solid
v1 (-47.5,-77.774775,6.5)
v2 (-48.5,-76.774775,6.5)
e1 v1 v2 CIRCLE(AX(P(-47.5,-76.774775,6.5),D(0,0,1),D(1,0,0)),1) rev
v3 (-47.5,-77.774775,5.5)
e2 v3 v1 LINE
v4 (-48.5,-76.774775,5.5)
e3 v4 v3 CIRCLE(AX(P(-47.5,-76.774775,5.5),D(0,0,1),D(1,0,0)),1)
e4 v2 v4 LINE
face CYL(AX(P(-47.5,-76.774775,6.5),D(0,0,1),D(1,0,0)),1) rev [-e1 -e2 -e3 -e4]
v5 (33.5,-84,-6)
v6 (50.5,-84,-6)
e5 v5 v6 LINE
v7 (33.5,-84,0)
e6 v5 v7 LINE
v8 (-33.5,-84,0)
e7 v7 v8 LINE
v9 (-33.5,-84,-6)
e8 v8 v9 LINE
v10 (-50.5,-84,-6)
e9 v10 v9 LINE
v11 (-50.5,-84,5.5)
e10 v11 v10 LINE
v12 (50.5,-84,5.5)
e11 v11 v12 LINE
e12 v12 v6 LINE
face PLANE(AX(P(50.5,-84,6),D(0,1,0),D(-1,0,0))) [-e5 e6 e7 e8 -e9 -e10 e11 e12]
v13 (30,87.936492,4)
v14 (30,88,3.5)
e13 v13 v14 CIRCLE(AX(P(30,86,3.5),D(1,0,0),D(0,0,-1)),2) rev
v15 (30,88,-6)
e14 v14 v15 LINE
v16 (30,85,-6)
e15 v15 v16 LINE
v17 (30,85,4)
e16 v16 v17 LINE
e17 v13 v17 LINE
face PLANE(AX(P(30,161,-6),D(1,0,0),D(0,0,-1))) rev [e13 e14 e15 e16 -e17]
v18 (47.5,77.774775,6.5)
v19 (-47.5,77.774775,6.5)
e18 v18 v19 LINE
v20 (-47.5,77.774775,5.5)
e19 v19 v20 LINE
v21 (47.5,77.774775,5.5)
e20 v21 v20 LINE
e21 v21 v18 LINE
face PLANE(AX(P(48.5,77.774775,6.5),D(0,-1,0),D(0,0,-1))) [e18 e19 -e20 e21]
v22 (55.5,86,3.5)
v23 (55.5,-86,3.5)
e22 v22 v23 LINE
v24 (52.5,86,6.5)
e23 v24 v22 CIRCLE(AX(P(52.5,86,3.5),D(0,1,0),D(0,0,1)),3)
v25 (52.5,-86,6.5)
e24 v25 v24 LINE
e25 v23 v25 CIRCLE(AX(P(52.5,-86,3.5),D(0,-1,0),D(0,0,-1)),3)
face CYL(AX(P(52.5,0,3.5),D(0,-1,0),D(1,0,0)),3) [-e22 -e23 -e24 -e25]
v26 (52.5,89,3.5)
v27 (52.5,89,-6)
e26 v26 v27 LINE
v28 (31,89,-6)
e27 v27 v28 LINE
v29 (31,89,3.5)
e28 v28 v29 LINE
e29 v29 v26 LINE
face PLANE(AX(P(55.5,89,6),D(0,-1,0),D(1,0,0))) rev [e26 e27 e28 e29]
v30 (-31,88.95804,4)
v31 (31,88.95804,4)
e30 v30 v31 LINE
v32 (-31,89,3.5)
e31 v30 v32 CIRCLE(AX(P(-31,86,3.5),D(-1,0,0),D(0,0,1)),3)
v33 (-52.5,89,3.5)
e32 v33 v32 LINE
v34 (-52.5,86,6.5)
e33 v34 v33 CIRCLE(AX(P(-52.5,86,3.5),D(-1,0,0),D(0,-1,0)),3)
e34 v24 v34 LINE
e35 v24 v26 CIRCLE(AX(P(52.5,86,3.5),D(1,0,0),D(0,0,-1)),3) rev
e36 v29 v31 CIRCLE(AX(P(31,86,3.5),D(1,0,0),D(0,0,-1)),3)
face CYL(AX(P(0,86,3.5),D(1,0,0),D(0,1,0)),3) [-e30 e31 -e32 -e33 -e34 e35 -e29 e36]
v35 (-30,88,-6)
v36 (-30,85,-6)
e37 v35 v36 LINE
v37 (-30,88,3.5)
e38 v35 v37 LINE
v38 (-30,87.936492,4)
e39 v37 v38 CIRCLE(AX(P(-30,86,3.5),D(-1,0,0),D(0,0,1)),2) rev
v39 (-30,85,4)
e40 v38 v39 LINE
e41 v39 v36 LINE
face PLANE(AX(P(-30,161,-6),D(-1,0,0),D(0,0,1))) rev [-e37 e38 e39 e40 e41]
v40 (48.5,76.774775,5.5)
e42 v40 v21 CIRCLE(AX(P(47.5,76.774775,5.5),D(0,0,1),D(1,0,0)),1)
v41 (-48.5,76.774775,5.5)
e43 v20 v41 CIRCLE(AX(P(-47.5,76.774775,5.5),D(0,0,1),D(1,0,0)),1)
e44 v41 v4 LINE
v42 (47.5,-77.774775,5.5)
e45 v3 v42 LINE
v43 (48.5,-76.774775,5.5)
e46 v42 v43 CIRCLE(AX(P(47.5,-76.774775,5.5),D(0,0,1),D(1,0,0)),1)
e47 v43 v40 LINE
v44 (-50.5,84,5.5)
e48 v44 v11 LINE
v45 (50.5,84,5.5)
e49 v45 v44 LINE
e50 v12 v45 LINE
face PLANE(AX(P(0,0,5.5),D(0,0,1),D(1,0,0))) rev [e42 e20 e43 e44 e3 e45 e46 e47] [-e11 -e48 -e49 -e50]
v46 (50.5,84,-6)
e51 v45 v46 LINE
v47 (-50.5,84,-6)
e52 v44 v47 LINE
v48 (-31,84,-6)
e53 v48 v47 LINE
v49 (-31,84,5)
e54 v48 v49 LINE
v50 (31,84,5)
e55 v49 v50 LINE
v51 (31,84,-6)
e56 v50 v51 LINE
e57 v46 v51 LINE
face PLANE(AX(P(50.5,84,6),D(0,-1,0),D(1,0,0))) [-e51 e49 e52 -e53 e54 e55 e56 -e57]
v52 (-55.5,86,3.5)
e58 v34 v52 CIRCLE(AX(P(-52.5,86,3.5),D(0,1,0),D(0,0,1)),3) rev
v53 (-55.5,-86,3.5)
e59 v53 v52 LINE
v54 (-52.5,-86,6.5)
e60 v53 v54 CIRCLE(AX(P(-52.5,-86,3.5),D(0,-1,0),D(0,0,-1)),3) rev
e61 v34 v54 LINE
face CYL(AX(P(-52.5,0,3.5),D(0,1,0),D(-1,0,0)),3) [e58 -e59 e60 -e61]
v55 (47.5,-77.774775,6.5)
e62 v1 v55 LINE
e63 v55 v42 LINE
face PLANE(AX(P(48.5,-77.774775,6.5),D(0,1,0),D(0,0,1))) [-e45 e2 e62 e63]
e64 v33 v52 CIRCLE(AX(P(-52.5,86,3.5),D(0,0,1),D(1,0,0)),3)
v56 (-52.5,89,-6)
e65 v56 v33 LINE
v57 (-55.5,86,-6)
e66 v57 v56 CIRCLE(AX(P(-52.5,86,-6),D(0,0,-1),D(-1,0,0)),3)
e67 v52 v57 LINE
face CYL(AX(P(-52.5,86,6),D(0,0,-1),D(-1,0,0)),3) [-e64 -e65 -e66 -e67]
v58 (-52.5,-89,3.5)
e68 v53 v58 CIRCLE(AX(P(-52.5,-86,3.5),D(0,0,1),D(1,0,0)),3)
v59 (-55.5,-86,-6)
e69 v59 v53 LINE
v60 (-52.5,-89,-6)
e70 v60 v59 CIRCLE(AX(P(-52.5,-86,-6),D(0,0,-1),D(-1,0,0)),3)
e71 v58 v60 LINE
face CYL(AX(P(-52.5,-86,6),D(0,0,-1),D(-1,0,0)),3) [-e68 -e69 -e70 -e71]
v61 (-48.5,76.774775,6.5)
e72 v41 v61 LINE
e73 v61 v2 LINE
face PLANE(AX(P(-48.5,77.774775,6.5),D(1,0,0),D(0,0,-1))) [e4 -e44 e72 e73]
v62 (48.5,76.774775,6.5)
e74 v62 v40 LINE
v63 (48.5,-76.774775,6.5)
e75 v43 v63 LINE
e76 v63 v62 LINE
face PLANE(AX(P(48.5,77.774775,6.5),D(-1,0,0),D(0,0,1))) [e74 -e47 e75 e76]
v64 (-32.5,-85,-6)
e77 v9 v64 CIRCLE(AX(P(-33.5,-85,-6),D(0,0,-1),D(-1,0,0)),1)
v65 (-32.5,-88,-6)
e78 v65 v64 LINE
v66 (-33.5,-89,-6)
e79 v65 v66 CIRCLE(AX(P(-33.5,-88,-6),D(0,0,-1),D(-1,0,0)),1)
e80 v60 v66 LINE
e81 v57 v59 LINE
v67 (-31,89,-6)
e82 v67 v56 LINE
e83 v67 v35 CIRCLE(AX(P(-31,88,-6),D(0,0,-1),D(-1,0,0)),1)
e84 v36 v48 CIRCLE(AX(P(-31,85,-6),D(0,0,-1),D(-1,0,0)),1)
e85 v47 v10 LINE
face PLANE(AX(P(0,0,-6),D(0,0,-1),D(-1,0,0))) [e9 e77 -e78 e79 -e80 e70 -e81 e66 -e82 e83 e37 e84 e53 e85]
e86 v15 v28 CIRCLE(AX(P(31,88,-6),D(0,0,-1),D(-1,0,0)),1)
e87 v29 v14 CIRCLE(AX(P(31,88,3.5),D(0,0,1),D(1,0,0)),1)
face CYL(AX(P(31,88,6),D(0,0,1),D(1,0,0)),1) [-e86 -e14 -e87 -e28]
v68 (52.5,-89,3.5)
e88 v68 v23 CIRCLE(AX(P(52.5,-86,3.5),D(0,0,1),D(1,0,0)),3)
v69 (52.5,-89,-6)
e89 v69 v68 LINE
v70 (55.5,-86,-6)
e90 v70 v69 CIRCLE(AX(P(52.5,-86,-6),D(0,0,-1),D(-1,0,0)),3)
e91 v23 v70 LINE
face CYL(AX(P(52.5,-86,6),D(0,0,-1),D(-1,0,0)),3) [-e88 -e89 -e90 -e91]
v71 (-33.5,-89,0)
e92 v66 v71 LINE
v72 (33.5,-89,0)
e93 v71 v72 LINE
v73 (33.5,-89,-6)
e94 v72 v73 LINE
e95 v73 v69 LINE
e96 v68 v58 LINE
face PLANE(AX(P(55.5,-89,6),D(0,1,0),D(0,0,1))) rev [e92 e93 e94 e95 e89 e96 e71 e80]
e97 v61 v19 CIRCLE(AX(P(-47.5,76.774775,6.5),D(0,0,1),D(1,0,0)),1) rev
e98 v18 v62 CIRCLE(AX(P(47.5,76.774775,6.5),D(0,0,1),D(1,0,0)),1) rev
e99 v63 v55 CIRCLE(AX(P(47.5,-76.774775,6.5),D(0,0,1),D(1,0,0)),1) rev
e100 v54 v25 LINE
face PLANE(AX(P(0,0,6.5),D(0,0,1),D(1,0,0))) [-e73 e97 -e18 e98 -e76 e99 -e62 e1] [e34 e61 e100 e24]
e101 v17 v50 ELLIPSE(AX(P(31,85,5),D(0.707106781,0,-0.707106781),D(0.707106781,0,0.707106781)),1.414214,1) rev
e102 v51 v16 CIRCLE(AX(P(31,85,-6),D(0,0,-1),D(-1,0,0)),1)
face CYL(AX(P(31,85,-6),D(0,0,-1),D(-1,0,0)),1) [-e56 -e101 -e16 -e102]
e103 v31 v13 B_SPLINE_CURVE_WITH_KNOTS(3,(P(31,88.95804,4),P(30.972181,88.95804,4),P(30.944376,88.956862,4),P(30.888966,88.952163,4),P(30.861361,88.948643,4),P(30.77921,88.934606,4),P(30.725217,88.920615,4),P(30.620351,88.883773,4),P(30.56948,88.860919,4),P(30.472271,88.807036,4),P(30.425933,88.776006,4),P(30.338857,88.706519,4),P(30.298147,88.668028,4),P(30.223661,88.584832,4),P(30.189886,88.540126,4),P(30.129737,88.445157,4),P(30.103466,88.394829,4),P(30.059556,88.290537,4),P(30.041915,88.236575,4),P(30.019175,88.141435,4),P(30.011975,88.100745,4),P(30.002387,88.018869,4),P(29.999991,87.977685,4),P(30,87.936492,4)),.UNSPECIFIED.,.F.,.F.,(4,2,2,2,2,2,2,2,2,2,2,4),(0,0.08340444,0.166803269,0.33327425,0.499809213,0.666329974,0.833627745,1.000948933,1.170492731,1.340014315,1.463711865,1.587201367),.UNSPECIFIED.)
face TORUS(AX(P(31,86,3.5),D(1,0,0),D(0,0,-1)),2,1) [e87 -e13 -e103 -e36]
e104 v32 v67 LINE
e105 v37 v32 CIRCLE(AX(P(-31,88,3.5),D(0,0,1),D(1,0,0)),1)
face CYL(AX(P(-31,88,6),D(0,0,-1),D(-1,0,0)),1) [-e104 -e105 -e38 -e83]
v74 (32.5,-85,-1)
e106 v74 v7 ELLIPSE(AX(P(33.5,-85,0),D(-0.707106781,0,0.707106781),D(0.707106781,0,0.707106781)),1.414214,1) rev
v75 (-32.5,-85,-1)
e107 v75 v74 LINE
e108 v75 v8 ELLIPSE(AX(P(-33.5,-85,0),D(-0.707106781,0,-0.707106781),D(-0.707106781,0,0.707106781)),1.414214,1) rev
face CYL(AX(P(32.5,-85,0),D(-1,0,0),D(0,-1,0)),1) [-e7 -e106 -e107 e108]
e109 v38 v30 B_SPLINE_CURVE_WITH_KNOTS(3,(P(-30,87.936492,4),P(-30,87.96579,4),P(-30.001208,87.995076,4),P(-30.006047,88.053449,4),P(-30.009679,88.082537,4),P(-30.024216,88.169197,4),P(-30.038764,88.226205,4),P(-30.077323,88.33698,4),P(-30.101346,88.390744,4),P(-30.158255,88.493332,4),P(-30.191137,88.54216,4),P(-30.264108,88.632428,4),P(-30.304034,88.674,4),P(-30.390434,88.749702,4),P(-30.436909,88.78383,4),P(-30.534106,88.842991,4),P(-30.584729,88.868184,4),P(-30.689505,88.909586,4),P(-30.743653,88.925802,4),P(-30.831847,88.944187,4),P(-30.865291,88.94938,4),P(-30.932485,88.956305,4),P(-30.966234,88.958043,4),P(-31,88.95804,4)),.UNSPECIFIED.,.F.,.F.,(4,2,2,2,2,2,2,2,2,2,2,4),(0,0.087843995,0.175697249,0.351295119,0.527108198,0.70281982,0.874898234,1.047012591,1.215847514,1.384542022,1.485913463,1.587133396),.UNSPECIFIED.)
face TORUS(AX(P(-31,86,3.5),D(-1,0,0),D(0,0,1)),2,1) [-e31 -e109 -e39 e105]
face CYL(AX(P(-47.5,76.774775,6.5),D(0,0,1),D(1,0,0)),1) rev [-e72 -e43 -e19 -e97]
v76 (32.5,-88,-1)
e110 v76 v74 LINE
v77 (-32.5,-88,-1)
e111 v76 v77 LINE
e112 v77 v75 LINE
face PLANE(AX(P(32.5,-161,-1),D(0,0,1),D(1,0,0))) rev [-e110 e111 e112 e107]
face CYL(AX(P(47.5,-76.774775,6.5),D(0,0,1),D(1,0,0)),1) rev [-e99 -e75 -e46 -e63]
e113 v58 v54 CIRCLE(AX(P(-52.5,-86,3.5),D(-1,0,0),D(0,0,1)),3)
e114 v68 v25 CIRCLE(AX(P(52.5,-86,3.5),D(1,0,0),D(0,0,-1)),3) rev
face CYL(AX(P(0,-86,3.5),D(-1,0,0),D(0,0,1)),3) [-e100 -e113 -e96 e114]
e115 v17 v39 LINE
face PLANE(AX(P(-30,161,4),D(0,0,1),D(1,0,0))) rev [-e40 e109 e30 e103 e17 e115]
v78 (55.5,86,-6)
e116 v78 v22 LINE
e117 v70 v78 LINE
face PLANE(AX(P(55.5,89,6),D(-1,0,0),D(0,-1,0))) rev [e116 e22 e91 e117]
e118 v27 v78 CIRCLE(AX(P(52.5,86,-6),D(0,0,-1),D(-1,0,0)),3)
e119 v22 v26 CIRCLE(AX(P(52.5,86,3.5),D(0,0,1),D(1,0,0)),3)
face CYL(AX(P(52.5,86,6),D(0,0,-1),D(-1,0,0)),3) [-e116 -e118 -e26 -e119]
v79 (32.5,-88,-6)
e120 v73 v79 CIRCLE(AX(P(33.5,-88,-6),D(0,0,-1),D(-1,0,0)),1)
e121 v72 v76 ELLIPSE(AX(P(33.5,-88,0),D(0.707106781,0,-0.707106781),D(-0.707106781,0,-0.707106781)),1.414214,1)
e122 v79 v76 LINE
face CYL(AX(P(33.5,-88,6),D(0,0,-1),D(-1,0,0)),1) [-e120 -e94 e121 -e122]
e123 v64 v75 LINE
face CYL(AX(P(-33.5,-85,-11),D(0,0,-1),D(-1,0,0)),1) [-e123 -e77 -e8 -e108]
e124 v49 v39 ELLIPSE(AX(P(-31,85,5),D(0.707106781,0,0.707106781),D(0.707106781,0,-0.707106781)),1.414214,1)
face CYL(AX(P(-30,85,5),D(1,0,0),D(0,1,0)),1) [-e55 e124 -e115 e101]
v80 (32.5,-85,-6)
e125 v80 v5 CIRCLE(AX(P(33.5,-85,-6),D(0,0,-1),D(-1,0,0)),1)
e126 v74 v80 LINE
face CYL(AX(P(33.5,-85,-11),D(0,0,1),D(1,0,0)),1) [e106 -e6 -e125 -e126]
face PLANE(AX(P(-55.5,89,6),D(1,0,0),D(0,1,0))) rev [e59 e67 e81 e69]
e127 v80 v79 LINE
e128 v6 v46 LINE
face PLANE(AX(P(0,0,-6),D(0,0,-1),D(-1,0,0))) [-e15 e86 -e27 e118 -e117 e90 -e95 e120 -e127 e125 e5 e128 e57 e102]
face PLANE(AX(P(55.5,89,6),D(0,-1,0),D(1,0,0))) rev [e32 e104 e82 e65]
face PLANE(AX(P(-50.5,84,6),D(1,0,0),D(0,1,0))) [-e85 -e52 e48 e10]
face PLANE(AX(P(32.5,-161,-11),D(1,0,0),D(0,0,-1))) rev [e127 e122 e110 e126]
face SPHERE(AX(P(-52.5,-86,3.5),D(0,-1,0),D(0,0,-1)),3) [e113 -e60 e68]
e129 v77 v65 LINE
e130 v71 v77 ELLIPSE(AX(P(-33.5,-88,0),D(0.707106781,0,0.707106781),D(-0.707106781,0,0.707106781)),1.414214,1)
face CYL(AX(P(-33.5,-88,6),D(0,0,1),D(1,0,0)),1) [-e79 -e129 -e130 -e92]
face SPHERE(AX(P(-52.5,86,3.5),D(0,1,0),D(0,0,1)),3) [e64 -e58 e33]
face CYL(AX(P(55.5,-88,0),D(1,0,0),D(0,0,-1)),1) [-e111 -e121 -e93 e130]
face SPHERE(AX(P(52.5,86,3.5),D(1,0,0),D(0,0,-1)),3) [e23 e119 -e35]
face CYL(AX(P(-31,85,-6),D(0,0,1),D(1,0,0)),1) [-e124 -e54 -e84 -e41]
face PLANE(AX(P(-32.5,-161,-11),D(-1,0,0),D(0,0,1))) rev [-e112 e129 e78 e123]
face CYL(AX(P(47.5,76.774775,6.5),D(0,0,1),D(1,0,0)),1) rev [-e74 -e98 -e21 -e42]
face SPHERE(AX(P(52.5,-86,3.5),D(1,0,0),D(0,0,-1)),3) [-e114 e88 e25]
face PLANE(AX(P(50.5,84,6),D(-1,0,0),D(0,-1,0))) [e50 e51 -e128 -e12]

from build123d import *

# Parameters (mm, degrees)
SKETCH1_W           = 111
SKETCH1_H           = 178
SKETCH1_W_2         = 101
SKETCH1_H_2         = 168
BOSS_EXTRUDE1_DEPTH = 6
SKETCH2_W           = 111
SKETCH2_H           = 178
SKETCH2_W_2         = 97
SKETCH2_H_2         = 155.54954955
BOSS_EXTRUDE2_DEPTH = 0.5
SKETCH3_W           = 60
SKETCH3_H           = 10
CUT_EXTRUDE1_DEPTH  = 77
SKETCH4_W           = 65
SKETCH4_H           = 10
CUT_EXTRUDE2_DEPTH  = 77
FILLET1_R           = 1
FILLET2_R           = 3
FILLET3_R           = 1


with BuildPart() as part:
    # Sketch1 → Boss-Extrude1 (new, symmetric)
    with BuildSketch(Plane.XY):
        Rectangle(SKETCH1_W, SKETCH1_H)
        Rectangle(SKETCH1_W_2, SKETCH1_H_2, mode=Mode.SUBTRACT)
    extrude(amount=BOSS_EXTRUDE1_DEPTH, both=True)

    # Sketch2 → Boss-Extrude2 (add, symmetric)
    with BuildSketch(Plane.XY.offset(6)):
        Rectangle(SKETCH2_W, SKETCH2_H)
        Rectangle(SKETCH2_W_2, SKETCH2_H_2, mode=Mode.SUBTRACT)
    extrude(amount=BOSS_EXTRUDE2_DEPTH, both=True)

    # Sketch3 → Cut-Extrude1 (cut)
    with BuildSketch(Plane.XZ.offset(-84)):
        with Locations((0, -1)):
            Rectangle(SKETCH3_W, SKETCH3_H)
    extrude(amount=-CUT_EXTRUDE1_DEPTH, mode=Mode.SUBTRACT)

    # Sketch4 → Cut-Extrude2 (cut)
    with BuildSketch(Plane(origin=(0, -84, 0), x_dir=(1, 0, 0), z_dir=(0, 1, 0))):
        with Locations((0, 6)):
            Rectangle(SKETCH4_W, SKETCH4_H)
    extrude(amount=-CUT_EXTRUDE2_DEPTH, mode=Mode.SUBTRACT)

    # Fillet1
    fillet1_edges = [part.edges().sort_by_distance(p)[0] for p in [
        (-48.5, -77.774774775, 6),
        (48.5, -77.774774775, 6),
        (48.5, 77.774774775, 6),
        (-48.5, 77.774774775, 6),
    ]]
    fillet(fillet1_edges, radius=FILLET1_R)

    # Fillet2
    # the kernel refuses this fillet: 3 mm, written as the material it takes off along each edge
    with BuildSketch(Plane(origin=(-52.5, -86, 3.5), x_dir=(0, -1, 0), z_dir=(0, 0, 1))) as fillet2_piece_1_section:
        Polygon((0, 0), (FILLET2_R, 0), (FILLET2_R, -FILLET2_R), (0, -FILLET2_R), align=None)
    fillet2_piece_1 = extrude(amount=FILLET2_R, mode=Mode.PRIVATE)
    fillet2_piece_1 = fillet2_piece_1 - Plane(origin=(-52.5, -86, 3.5), x_dir=(0.7071067811865475, 0.7071067811865477, 0), z_dir=(0, 0, 1)) * Sphere(FILLET2_R, mode=Mode.PRIVATE)
    add(fillet2_piece_1, mode=Mode.SUBTRACT)
    with BuildSketch(Plane(origin=(-52.5, 86, 3.5), x_dir=(-1, 0, 0), z_dir=(0, 0, 1))) as fillet2_piece_2_section:
        Polygon((0, 0), (FILLET2_R, 0), (FILLET2_R, -FILLET2_R), (0, -FILLET2_R), align=None)
    fillet2_piece_2 = extrude(amount=FILLET2_R, mode=Mode.PRIVATE)
    fillet2_piece_2 = fillet2_piece_2 - Plane(origin=(-52.5, 86, 3.5), x_dir=(0.7071067811865477, -0.7071067811865474, 0), z_dir=(0, 0, 1)) * Sphere(FILLET2_R, mode=Mode.PRIVATE)
    add(fillet2_piece_2, mode=Mode.SUBTRACT)
    with BuildSketch(Plane(origin=(52.5, -86, 3.5), x_dir=(0, -1, 0), z_dir=(0, 0, 1))) as fillet2_piece_3_section:
        Polygon((0, 0), (FILLET2_R, 0), (FILLET2_R, FILLET2_R), (0, FILLET2_R), align=None)
    fillet2_piece_3 = extrude(amount=FILLET2_R, mode=Mode.PRIVATE)
    fillet2_piece_3 = fillet2_piece_3 - Plane(origin=(52.5, -86, 3.5), x_dir=(-0.7071067811865476, 0.7071067811865475, 0), z_dir=(0, 0, 1)) * Sphere(FILLET2_R, mode=Mode.PRIVATE)
    add(fillet2_piece_3, mode=Mode.SUBTRACT)
    with BuildSketch(Plane(origin=(52.5, 86, 3.5), x_dir=(0, 1, 0), z_dir=(0, 0, 1))) as fillet2_piece_4_section:
        Polygon((0, 0), (FILLET2_R, 0), (FILLET2_R, -FILLET2_R), (0, -FILLET2_R), align=None)
    fillet2_piece_4 = extrude(amount=FILLET2_R, mode=Mode.PRIVATE)
    fillet2_piece_4 = fillet2_piece_4 - Plane(origin=(52.5, 86, 3.5), x_dir=(-0.7071067811865474, -0.7071067811865477, 0), z_dir=(0, 0, 1)) * Sphere(FILLET2_R, mode=Mode.PRIVATE)
    add(fillet2_piece_4, mode=Mode.SUBTRACT)
    with BuildSketch(Plane(origin=(-55.5, -86, 6.5), x_dir=(1, 0, 0), z_dir=(0, 1, 0)), Plane(origin=(55.5, 86, 6.5), x_dir=(-1, 0, 0), z_dir=(0, -1, 0))) as fillet2_piece_5:
        with BuildLine():
            CenterArc((FILLET2_R, FILLET2_R), FILLET2_R, 180, 90)
            Line((0, FILLET2_R), (0, 0))
            Line((0, 0), (FILLET2_R, 0))
        make_face()
    extrude(amount=172, mode=Mode.SUBTRACT)
    with BuildSketch(Plane(origin=(52.5, -89, 6.5), x_dir=(0, 1, 0), z_dir=(-1, 0, 0)), Plane(origin=(-52.5, 89, 6.5), x_dir=(0, -1, 0), z_dir=(1, 0, 0))) as fillet2_piece_6:
        with BuildLine():
            CenterArc((FILLET2_R, FILLET2_R), FILLET2_R, 180, 90)
            Line((0, FILLET2_R), (0, 0))
            Line((0, 0), (FILLET2_R, 0))
        make_face()
    extrude(amount=105, mode=Mode.SUBTRACT)
    with BuildSketch(Plane(origin=(55.5, 89, -13.5), x_dir=(-1, 0, 0), z_dir=(0, 0, 1))) as fillet2_piece_7:
        with BuildLine():
            CenterArc((FILLET2_R, FILLET2_R), FILLET2_R, 180, 90)
            Line((0, FILLET2_R), (0, 0))
            Line((0, 0), (FILLET2_R, 0))
        make_face()
    extrude(amount=17, mode=Mode.SUBTRACT)
    with BuildSketch(Plane(origin=(-55.5, 89, 3.5), x_dir=(0, -1, 0), z_dir=(0, 0, -1)), Plane(origin=(55.5, -89, -13.5), x_dir=(-1, 0, 0), z_dir=(0, 0, 1)), Plane(origin=(-55.5, -89, 3.5), x_dir=(1, 0, 0), z_dir=(0, 0, -1))) as fillet2_piece_8:
        with BuildLine():
            CenterArc((FILLET2_R, -FILLET2_R), FILLET2_R, 90, 90)
            Line((0, -FILLET2_R), (0, 0))
            Line((0, 0), (FILLET2_R, 0))
        make_face()
    extrude(amount=17, mode=Mode.SUBTRACT)

    # Fillet3
    fillet3_edges = [part.edges().sort_by_distance(p)[0] for p in [
        (-30, 89, -1.25),
        (-30, 88.989491568, 3.750878781),
        (30, 88.989491568, 3.750878781),
        (30, 89, -1.25),
        (-30, 84, -1),
        (30, 84, -1),
        (0, 84, 4),
        (0, -89, -1),
        (32.5, -89, -3.5),
        (-32.5, -89, -3.5),
        (32.5, -84, -3.5),
        (-32.5, -84, -3.5),
        (0, -84, -1),
    ]]
    fillet(fillet3_edges, radius=FILLET3_R)


solid = part.part
